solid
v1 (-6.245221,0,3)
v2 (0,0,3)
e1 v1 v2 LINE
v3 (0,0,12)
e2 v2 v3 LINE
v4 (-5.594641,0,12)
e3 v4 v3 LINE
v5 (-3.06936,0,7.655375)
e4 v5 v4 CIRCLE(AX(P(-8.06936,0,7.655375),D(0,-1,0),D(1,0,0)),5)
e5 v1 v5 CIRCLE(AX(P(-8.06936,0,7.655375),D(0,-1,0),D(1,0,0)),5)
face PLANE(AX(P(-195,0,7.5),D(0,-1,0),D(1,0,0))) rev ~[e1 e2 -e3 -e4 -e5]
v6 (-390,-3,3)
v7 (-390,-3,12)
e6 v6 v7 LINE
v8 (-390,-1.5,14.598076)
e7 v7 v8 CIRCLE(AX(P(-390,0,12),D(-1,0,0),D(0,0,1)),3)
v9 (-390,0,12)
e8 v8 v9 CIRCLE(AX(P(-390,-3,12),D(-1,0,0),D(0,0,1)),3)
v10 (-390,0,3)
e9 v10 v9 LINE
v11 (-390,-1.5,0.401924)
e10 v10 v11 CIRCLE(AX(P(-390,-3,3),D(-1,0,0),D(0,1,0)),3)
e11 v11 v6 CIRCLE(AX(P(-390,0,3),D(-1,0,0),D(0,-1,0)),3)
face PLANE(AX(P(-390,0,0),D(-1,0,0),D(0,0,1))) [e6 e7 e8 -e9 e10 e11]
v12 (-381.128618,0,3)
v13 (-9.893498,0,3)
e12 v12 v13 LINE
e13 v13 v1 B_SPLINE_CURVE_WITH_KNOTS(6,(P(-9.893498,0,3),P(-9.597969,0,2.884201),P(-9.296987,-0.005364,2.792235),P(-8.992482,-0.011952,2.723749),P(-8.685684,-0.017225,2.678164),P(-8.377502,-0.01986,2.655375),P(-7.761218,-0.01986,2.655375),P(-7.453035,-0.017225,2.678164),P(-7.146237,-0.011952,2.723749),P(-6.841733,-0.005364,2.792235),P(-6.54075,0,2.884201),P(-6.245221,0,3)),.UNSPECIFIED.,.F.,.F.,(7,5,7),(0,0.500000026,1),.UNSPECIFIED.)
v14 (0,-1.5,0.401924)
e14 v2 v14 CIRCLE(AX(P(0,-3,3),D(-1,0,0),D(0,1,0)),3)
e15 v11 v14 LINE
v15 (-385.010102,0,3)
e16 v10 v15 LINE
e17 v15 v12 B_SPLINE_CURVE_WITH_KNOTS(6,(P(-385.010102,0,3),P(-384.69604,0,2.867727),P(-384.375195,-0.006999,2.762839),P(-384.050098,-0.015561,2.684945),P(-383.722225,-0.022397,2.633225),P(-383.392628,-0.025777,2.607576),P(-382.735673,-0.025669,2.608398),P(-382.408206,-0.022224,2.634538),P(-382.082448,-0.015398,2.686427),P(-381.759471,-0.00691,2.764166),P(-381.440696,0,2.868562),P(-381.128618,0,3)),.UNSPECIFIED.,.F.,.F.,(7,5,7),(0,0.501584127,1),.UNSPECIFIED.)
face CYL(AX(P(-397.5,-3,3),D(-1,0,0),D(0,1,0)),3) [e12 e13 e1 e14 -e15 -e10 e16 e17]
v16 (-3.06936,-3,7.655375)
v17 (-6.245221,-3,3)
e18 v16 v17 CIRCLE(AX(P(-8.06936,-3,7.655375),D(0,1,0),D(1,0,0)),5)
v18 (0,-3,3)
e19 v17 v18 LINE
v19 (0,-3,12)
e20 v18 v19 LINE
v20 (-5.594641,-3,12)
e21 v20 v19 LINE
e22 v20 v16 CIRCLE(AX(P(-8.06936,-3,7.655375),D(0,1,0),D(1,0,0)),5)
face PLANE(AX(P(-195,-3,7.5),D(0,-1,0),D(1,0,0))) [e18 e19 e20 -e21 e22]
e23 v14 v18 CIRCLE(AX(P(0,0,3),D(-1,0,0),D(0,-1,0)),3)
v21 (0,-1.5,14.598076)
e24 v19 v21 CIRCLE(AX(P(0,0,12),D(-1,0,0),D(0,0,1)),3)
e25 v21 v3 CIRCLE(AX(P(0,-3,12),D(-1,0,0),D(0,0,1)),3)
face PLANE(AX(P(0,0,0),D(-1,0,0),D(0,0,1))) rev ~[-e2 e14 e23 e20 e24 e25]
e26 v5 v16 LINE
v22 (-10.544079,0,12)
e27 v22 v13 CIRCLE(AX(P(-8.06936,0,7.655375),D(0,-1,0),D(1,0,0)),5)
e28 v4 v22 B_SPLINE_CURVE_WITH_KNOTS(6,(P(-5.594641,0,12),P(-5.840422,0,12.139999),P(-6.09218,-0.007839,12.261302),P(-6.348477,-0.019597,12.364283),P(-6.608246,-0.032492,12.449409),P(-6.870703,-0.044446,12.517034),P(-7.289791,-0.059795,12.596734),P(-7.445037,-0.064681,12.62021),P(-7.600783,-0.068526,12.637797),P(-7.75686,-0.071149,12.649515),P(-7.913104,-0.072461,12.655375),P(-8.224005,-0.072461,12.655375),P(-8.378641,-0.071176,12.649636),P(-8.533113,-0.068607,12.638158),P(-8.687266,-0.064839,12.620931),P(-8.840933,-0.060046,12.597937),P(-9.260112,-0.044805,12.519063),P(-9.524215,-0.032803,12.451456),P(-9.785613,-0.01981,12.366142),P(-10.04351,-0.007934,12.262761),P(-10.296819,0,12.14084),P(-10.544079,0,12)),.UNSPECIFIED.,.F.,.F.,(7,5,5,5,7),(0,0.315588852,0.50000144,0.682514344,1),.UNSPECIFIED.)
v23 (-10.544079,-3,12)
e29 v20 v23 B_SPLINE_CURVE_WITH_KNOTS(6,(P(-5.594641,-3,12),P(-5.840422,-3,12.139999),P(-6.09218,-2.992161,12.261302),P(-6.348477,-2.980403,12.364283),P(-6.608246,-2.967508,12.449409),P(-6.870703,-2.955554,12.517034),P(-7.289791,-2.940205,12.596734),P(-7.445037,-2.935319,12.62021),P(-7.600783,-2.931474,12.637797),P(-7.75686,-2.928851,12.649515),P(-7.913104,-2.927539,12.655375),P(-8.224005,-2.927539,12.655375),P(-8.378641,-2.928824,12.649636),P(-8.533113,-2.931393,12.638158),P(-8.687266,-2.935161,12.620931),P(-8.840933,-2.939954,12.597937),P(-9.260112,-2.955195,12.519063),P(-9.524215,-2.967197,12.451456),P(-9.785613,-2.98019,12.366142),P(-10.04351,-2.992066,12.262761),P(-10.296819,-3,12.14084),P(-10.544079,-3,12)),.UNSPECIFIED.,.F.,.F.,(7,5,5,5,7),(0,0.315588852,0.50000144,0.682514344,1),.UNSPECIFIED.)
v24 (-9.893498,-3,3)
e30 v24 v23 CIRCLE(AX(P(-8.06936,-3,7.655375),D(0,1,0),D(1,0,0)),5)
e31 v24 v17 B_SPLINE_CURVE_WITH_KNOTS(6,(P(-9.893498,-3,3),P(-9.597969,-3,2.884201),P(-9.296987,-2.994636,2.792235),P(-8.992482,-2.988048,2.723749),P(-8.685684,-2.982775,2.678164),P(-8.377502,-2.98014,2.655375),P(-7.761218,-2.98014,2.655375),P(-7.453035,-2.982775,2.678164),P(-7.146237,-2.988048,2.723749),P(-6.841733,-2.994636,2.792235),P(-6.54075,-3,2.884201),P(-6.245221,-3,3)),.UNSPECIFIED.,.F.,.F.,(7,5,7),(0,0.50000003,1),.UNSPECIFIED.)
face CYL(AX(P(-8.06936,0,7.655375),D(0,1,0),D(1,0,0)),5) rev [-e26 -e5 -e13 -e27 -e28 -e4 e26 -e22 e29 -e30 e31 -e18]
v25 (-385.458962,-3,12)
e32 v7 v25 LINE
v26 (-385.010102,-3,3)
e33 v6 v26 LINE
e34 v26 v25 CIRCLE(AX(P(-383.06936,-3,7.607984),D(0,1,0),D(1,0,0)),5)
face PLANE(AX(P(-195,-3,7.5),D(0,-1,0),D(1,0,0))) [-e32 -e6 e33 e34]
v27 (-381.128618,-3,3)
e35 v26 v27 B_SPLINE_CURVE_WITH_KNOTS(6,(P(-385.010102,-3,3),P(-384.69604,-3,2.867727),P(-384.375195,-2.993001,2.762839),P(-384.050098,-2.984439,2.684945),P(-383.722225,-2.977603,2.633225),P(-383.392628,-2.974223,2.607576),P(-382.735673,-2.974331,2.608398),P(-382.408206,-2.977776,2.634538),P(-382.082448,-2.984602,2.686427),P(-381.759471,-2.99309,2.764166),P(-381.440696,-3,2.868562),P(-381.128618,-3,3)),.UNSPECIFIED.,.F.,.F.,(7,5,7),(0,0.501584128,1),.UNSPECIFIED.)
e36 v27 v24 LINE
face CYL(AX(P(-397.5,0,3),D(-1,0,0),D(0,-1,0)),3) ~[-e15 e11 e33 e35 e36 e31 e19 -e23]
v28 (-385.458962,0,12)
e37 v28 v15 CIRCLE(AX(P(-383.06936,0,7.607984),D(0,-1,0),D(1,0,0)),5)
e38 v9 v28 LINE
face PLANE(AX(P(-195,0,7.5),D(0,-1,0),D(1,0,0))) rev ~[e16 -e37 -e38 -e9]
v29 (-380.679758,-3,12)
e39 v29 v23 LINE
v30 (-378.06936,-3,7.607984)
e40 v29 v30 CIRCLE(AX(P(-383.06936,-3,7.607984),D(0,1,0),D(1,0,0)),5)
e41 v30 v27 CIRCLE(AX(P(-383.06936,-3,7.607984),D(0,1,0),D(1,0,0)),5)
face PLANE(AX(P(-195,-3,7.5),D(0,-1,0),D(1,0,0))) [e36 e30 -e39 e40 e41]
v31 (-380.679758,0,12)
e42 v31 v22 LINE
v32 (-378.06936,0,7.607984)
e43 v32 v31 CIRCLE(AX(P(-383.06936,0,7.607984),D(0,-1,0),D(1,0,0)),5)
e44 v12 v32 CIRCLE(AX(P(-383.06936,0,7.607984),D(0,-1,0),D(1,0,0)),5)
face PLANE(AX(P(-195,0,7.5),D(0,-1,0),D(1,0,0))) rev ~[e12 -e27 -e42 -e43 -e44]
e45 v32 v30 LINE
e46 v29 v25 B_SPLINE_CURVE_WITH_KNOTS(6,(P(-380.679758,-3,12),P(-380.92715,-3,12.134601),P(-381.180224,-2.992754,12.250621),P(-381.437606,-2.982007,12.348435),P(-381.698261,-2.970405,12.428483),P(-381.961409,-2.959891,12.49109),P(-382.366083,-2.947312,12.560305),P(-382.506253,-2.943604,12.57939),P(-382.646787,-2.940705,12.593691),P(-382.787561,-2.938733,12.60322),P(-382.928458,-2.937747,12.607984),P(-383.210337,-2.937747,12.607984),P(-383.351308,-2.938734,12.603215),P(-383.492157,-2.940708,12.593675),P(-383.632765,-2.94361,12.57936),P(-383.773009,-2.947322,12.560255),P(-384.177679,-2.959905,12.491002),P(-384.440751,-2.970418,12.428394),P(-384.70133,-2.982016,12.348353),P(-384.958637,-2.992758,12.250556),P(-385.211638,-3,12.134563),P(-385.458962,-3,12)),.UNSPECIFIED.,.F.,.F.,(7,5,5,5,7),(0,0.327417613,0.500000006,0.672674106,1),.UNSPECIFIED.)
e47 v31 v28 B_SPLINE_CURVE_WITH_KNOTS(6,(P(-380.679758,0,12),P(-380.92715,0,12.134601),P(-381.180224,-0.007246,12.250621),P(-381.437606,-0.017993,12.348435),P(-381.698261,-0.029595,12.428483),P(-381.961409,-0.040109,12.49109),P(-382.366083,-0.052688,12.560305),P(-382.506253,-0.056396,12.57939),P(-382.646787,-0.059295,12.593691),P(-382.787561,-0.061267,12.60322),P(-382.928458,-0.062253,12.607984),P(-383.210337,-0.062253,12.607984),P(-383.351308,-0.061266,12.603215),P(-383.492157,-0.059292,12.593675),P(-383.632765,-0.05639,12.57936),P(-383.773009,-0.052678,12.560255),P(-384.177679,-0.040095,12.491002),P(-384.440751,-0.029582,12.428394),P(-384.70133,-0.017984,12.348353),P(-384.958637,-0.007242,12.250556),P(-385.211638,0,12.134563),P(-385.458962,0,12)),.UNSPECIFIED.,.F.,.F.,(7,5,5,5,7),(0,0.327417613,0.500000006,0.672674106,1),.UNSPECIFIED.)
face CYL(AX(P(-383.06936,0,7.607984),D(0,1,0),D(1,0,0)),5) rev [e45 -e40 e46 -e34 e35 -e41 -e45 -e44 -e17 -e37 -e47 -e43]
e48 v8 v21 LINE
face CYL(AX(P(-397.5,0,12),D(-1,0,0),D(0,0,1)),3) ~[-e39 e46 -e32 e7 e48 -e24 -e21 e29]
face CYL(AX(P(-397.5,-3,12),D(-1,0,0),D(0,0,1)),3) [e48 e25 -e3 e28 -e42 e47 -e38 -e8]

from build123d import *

# Parameters (mm, degrees)
F0_W        = 390
F0_H        = 15
F1_DEPTH    = 3
F2_R        = 5
F3_DEPTH    = 20
F4_T1_DEPTH = 405


# Not quite as in the source:
# - a fillet or chamfer that OpenCascade refuses, or shapes differently, is made with other operations: its cross-section is extruded or revolved along the edge and cut away or added


with BuildPart() as f1:
    # F0 (on Front) → F1 (new body)
    with BuildSketch(Plane.XZ):
        with Locations((-195, 7.5)):
            Rectangle(F0_W, F0_H)
    extrude(amount=F1_DEPTH)

    # F2 (on Front) → F3 (cut)
    with BuildSketch(Plane.XZ):
        with Locations((-383.0693596974, 7.6079843566)):
            Circle(F2_R)
        with Locations((-8.0693596974, 7.6553751715)):
            Circle(F2_R)
    extrude(amount=F3_DEPTH, mode=Mode.SUBTRACT)

    # F4: fillet of radius 3 on 4 edges, made by hand

    # F4_s2 → F4_t1 (cut)
    with BuildSketch(Plane.YZ.offset(-397.5)):
        with BuildLine():
            ThreePointArc((-3, 15), (-0.8786796564, 14.1213203436), (0, 12))
            Line((0, 12), (0, 15))
            Line((0, 15), (-3, 15))
        make_face()
        with BuildLine():
            ThreePointArc((0, 3), (-0.8786796564, 0.8786796564), (-3, 0))
            Line((-3, 0), (0, 0))
            Line((0, 0), (0, 3))
        make_face()
        with BuildLine():
            ThreePointArc((0, 15), (-2.1213203436, 14.1213203436), (-3, 12))
            Line((-3, 12), (-3, 15))
            Line((-3, 15), (0, 15))
        make_face()
        with BuildLine():
            ThreePointArc((-3, 3), (-2.1213203436, 0.8786796564), (0, 0))
            Line((0, 0), (-3, 0))
            Line((-3, 0), (-3, 3))
        make_face()
    extrude(amount=F4_T1_DEPTH, mode=Mode.SUBTRACT)


solid = f1.part
